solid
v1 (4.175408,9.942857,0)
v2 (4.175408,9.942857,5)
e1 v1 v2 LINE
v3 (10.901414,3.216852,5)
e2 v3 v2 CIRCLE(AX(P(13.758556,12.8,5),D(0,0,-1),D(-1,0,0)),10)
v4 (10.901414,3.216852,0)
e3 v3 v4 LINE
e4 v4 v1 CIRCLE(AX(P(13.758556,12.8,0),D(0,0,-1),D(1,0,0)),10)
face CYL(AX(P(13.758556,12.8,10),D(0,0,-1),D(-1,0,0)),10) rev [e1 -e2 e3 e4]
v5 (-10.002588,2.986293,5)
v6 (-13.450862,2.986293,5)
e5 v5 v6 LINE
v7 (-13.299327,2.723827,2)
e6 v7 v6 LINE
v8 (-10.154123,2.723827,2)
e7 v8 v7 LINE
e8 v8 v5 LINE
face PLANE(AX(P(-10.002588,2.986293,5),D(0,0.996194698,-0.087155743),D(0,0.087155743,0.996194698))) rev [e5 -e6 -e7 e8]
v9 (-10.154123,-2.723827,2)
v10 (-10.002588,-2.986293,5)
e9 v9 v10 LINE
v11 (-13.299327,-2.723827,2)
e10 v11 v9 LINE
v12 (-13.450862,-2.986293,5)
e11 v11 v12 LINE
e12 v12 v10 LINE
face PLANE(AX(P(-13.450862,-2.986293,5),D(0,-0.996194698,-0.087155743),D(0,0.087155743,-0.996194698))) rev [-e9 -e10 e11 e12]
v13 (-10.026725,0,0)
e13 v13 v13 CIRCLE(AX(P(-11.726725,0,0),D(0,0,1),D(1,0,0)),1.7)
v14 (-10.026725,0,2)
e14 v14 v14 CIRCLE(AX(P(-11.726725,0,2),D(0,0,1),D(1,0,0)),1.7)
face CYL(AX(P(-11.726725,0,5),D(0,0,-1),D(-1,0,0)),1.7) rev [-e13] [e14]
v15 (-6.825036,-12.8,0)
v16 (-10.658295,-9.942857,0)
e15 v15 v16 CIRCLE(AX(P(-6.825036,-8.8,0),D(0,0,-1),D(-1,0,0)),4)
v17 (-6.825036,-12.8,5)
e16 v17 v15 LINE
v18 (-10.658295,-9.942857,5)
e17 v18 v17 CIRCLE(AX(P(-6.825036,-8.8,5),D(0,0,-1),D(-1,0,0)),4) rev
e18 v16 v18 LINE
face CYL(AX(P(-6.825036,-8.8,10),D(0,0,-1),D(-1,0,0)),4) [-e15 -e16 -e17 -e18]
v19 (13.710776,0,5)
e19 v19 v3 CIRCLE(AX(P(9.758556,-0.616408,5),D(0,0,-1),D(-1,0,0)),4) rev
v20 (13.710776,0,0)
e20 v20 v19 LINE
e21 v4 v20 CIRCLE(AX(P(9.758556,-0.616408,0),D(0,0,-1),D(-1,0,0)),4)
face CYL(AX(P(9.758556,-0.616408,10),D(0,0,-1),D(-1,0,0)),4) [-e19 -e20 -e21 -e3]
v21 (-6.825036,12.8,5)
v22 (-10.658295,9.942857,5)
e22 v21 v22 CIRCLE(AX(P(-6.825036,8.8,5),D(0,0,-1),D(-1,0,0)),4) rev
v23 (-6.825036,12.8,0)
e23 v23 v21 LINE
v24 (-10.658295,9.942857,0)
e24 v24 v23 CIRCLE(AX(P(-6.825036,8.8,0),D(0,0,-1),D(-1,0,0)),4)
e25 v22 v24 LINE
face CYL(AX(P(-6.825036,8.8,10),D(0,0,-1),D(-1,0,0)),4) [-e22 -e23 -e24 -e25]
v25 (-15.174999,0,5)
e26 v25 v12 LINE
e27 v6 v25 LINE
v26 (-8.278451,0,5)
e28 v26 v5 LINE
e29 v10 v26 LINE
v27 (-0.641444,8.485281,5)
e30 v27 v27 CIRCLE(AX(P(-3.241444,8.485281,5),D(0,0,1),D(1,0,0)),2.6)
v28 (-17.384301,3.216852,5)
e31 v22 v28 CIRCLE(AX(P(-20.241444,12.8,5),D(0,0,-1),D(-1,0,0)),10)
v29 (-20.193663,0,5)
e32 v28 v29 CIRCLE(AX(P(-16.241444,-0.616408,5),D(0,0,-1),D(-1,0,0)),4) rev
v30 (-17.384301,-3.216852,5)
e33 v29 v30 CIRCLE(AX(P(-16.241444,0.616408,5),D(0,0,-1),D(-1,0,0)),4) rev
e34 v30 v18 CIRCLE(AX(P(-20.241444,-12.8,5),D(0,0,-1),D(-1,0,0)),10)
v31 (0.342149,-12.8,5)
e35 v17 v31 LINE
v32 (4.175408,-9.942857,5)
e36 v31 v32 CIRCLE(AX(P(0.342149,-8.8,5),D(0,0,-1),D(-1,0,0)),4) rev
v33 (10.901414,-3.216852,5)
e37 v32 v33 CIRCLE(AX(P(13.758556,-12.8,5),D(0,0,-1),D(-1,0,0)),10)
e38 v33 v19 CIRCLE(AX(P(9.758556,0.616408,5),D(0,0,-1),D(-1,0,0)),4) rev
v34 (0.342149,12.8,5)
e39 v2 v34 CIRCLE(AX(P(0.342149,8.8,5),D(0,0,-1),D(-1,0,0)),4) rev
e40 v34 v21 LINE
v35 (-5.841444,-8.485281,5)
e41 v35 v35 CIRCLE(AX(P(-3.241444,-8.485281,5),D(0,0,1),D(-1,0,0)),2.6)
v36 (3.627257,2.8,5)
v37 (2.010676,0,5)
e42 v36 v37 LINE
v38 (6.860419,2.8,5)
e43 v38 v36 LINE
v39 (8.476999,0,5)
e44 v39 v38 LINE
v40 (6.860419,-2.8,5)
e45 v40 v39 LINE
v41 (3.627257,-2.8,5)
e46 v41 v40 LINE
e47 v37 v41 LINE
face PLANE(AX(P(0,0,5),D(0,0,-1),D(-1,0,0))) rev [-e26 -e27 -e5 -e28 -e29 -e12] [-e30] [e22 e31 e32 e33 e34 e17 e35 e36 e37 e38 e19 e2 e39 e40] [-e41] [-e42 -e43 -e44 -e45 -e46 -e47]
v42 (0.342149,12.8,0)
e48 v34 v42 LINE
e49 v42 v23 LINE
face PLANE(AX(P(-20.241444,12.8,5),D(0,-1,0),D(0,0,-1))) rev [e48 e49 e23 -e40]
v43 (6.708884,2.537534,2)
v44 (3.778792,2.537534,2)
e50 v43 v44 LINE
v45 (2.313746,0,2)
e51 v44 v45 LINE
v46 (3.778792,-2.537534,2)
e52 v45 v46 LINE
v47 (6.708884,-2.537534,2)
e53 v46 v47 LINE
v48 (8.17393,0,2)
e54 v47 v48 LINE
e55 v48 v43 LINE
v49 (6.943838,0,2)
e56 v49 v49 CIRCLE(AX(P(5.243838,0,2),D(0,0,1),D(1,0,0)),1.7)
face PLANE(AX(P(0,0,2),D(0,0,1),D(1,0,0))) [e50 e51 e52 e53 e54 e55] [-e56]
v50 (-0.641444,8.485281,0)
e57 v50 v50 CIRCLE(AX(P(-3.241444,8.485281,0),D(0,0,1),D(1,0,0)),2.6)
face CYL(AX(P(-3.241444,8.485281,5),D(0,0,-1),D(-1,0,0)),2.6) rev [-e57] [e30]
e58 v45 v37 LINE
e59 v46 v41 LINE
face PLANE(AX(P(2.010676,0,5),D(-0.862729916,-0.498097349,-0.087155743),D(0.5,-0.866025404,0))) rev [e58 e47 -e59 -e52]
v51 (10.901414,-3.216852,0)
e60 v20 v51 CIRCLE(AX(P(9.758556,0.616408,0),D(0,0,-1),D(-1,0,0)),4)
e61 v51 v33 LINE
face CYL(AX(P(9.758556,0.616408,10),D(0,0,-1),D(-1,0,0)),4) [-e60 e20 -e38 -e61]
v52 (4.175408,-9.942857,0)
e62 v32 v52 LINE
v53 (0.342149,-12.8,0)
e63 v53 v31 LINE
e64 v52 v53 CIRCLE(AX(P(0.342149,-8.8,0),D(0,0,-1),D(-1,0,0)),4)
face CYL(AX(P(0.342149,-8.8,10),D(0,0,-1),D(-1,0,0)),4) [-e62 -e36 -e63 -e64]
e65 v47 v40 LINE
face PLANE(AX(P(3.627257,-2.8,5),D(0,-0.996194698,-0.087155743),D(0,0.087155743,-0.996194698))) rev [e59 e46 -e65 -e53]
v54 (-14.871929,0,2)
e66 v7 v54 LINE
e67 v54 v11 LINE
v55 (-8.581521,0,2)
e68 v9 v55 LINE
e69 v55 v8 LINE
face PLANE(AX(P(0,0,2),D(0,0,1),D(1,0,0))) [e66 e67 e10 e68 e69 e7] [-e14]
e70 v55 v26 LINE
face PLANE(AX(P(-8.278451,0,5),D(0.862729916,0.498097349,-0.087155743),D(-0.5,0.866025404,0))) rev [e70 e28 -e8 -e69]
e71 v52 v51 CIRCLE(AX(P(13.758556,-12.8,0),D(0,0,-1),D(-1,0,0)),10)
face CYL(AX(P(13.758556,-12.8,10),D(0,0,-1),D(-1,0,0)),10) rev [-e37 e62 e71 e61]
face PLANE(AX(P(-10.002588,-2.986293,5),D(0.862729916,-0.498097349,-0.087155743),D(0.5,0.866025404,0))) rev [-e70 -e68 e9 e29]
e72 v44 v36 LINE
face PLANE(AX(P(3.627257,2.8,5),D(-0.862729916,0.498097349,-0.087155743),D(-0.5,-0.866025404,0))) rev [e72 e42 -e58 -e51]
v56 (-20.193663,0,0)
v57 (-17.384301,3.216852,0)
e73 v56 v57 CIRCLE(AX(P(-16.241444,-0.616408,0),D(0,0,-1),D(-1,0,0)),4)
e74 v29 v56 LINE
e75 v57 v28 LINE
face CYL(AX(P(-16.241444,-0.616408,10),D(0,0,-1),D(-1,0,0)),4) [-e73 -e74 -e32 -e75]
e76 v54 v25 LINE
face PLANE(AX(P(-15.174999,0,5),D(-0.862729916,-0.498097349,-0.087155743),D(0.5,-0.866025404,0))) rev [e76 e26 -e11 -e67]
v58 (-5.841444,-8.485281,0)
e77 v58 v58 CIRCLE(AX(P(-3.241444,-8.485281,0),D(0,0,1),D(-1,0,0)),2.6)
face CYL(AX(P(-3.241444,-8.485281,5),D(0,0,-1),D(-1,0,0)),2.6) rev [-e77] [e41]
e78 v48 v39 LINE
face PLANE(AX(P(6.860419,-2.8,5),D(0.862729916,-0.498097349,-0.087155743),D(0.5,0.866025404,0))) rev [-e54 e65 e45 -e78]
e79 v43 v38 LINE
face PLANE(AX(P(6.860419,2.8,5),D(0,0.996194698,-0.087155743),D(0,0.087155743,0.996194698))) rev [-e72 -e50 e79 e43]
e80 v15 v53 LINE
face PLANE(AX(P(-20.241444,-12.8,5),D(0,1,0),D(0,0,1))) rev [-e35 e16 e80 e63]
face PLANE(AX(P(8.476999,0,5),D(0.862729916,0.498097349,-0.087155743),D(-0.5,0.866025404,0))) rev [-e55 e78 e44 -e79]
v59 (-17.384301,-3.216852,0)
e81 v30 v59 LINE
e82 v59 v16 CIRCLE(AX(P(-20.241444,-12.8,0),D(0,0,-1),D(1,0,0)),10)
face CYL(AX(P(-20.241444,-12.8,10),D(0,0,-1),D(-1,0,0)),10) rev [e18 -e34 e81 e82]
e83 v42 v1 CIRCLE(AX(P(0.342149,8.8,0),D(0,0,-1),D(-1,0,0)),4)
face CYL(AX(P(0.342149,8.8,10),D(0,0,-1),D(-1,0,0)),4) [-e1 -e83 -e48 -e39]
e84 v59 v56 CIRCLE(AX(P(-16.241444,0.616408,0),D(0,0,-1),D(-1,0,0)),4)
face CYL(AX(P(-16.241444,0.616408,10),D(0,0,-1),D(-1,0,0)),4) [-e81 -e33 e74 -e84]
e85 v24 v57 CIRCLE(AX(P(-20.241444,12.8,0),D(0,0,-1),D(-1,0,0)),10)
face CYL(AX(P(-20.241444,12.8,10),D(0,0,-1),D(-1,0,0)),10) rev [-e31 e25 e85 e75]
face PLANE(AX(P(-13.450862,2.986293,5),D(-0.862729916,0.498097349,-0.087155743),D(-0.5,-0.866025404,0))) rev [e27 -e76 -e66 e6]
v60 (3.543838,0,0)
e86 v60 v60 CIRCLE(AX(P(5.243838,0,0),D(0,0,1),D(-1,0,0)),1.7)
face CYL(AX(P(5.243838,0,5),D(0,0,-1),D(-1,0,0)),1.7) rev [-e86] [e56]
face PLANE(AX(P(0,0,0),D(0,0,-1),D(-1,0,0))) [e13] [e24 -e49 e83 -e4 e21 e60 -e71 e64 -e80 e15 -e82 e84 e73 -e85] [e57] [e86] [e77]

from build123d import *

# Parameters (mm, degrees)
ESQUISSE1_W                       = 34
ESQUISSE1_H                       = 25.6
ESQUISSE1_R                       = 1.7
ESQUISSE1_R_2                     = 2.6
BOSS_EXTRU_1_DEPTH                = 5
ENL_V_MAT_EXTRU_2_DEPTH           = 3
ENL_V_MAT_EXTRU_2_DRAFT           = -5
ENL_V_MAT_EXTRU_2_PROFILE_2_DEPTH = 3
ENL_V_MAT_EXTRU_2_PROFILE_2_DRAFT = -5
ENL_V_MAT_EXTRU_3_DEPTH           = 10
CONG_1_R                          = 4


with BuildPart() as part:
    # Esquisse1 → Boss.-Extru.1 (new body)
    with BuildSketch(Plane.XY):
        with Locations((-3.241443597, 0)):
            Rectangle(ESQUISSE1_W, ESQUISSE1_H)
        with Locations((-11.726724972, 0)):
            Circle(ESQUISSE1_R, mode=Mode.SUBTRACT)
        with Locations((-3.241443597, 8.485281374)):
            Circle(ESQUISSE1_R_2, mode=Mode.SUBTRACT)
        with Locations(Location((-3.241443597, -8.485281374, 0), (0, 0, 180))):
            Circle(ESQUISSE1_R_2, mode=Mode.SUBTRACT)
        with Locations(Location((5.243837777, 0, 0), (0, 0, 180))):
            Circle(ESQUISSE1_R, mode=Mode.SUBTRACT)
    extrude(amount=BOSS_EXTRU_1_DEPTH)


with BuildPart() as enl_v_mat_extru_2_tool:
    # Esquisse3 → Enlèv. mat.-Extru.2 (with draft: the straight prism first)
    with BuildSketch(Plane.XY.offset(5)):
        Polygon((-8.278451106, 0), (-10.002588039, 2.986292767), (-13.450861905, 2.986292767), (-15.174998837, 0), (-13.450861905, -2.986292767), (-10.002588039, -2.986292767), align=None)
    extrude(amount=-ENL_V_MAT_EXTRU_2_DEPTH)
    # Enlèv. mat.-Extru.2: the draft: its side faces are tilted about the plane it starts from
    enl_v_mat_extru_2_sides = [enl_v_mat_extru_2_tool.faces().sort_by_distance(p)[0] for p in [
        (-9.140519572, 1.493146384, 3.5),
        (-11.726724972, 2.986292767, 3.5),
        (-14.312930371, 1.493146384, 3.5),
        (-14.312930371, -1.493146384, 3.5),
        (-11.726724972, -2.986292767, 3.5),
        (-9.140519572, -1.493146384, 3.5),
    ]]
    draft(enl_v_mat_extru_2_sides, Plane.XY.offset(5), ENL_V_MAT_EXTRU_2_DRAFT)


with BuildPart() as part_1:
    add(part.part)

    # Enlèv. mat.-Extru.2: cut by enl_v_mat_extru_2_tool
    add(enl_v_mat_extru_2_tool.part, mode=Mode.SUBTRACT)


with BuildPart() as enl_v_mat_extru_2_profile_2_tool:
    # Esquisse3 → Enlèv. mat.-Extru.2 profile 2 (with draft: the straight prism first)
    with BuildSketch(Plane.XY.offset(5)):
        Polygon((8.476999284, 0), (6.860418531, 2.8), (3.627257023, 2.8), (2.010676269, 0), (3.627257023, -2.8), (6.860418531, -2.8), align=None)
    extrude(amount=-ENL_V_MAT_EXTRU_2_PROFILE_2_DEPTH)
    # Enlèv. mat.-Extru.2 profile 2: the draft: its side faces are tilted about the plane it starts from
    enl_v_mat_extru_2_profile_2_sides = [enl_v_mat_extru_2_profile_2_tool.faces().sort_by_distance(p)[0] for p in [
        (7.668708907, 1.4, 3.5),
        (5.243837777, 2.8, 3.5),
        (2.818966646, 1.4, 3.5),
        (2.818966646, -1.4, 3.5),
        (5.243837777, -2.8, 3.5),
        (7.668708907, -1.4, 3.5),
    ]]
    draft(enl_v_mat_extru_2_profile_2_sides, Plane.XY.offset(5), ENL_V_MAT_EXTRU_2_PROFILE_2_DRAFT)


with BuildPart() as part_2:
    add(part_1.part)

    # Enlèv. mat.-Extru.2 profile 2: cut by enl_v_mat_extru_2_profile_2_tool
    add(enl_v_mat_extru_2_profile_2_tool.part, mode=Mode.SUBTRACT)

    # Esquisse4 → Enlèv. mat.-Extru.3 (cut)
    with BuildSketch(Plane(origin=(0, 0, 0), x_dir=(-1, 0, 0), z_dir=(0, 0, -1))):
        with BuildLine():
            Line((10.241443597, 12.8), (20.241443597, 12.8))
            Line((20.241443597, 12.8), (20.241443597, 2.8))
            ThreePointArc((20.241443597, 2.8), (13.170375785, 5.728932188), (10.241443597, 12.8))
        make_face()
        with BuildLine():
            Line((20.241443597, -12.8), (20.241443597, -2.8))
            ThreePointArc((20.241443597, -2.8), (13.170375785, -5.728932188), (10.241443597, -12.8))
            Line((10.241443597, -12.8), (20.241443597, -12.8))
        make_face()
        with BuildLine():
            Line((-3.758556403, -12.8), (-13.758556403, -12.8))
            Line((-13.758556403, -12.8), (-13.758556403, -2.8))
            ThreePointArc((-13.758556403, -2.8), (-6.687488591, -5.728932188), (-3.758556403, -12.8))
        make_face()
        with BuildLine():
            Line((-13.758556403, 12.8), (-13.758556403, 2.8))
            ThreePointArc((-13.758556403, 2.8), (-6.687488591, 5.728932188), (-3.758556403, 12.8))
            Line((-3.758556403, 12.8), (-13.758556403, 12.8))
        make_face()
    extrude(amount=-ENL_V_MAT_EXTRU_3_DEPTH, mode=Mode.SUBTRACT)

    # Congé1
    # the kernel refuses this fillet: 4 mm, written as the material it takes off along each edge
    with BuildSketch(Plane(origin=(-10.241443597, -12.8, -8.541019662), x_dir=(1, 0, 0), z_dir=(0, 0, 1)), Plane(origin=(-20.241443597, 2.8, -8.541019662), x_dir=(0, -1, 0), z_dir=(0, 0, 1)), Plane(origin=(3.758556403, 12.8, -8.541019662), x_dir=(-1, 0, 0), z_dir=(0, 0, 1))) as cong_1_piece_1:
        with BuildLine():
            CenterArc((3.416407865, 4), CONG_1_R, 196.601549599, 73.398450401)
            ThreePointArc((-0.416851525, 2.857142857), (-0.104761631, 1.443695821), (0, 0))
            Line((0, 0), (3.416407865, 0))
        make_face()
    extrude(amount=22.082039325, mode=Mode.SUBTRACT)
    with BuildSketch(Plane(origin=(-20.241443597, -2.8, -8.541019662), x_dir=(0.9895238368781002, -0.14436958214957515, 0), z_dir=(0, 0, 1)), Plane(origin=(-10.241443597, 12.8, -8.541019662), x_dir=(-0.14436958214957388, -0.9895238368781005, 0), z_dir=(0, 0, 1)), Plane(origin=(13.758556403, 2.8, -8.541019662), x_dir=(-0.9895238368781005, 0.14436958214957332, 0), z_dir=(0, 0, 1))) as cong_1_piece_2:
        with BuildLine():
            CenterArc((3.464869972, 3.958095348), CONG_1_R, 188.300774799, 73.398450401)
            Line((-0.493225376, 3.380617019), (0, 0))
            ThreePointArc((0, 0), (1.443695821, 0.104761631), (2.887391643, 0))
        make_face()
    extrude(amount=22.082039325, mode=Mode.SUBTRACT)
    with BuildSketch(Plane(origin=(3.758556403, -12.8, -8.541019662), x_dir=(-1, 0, 0), z_dir=(0, 0, 1))) as cong_1_piece_3:
        with BuildLine():
            CenterArc((3.416407865, -4), CONG_1_R, 90, 73.398450401)
            ThreePointArc((-0.416851525, -2.857142857), (-0.104761631, -1.443695821), (0, 0))
            Line((0, 0), (3.416407865, 0))
        make_face()
    extrude(amount=22.082039325, mode=Mode.SUBTRACT)
    with BuildSketch(Plane(origin=(13.758556403, -2.8, -8.541019662), x_dir=(-0.9895238368781001, -0.14436958214957546, 0), z_dir=(0, 0, 1))) as cong_1_piece_4:
        with BuildLine():
            CenterArc((3.464869972, -3.958095348), CONG_1_R, 98.3007748, 73.398450401)
            Line((-0.493225376, -3.380617019), (0, 0))
            ThreePointArc((0, 0), (1.443695821, -0.104761631), (2.887391643, 0))
        make_face()
    extrude(amount=22.082039325, mode=Mode.SUBTRACT)


solid = part_2.part
